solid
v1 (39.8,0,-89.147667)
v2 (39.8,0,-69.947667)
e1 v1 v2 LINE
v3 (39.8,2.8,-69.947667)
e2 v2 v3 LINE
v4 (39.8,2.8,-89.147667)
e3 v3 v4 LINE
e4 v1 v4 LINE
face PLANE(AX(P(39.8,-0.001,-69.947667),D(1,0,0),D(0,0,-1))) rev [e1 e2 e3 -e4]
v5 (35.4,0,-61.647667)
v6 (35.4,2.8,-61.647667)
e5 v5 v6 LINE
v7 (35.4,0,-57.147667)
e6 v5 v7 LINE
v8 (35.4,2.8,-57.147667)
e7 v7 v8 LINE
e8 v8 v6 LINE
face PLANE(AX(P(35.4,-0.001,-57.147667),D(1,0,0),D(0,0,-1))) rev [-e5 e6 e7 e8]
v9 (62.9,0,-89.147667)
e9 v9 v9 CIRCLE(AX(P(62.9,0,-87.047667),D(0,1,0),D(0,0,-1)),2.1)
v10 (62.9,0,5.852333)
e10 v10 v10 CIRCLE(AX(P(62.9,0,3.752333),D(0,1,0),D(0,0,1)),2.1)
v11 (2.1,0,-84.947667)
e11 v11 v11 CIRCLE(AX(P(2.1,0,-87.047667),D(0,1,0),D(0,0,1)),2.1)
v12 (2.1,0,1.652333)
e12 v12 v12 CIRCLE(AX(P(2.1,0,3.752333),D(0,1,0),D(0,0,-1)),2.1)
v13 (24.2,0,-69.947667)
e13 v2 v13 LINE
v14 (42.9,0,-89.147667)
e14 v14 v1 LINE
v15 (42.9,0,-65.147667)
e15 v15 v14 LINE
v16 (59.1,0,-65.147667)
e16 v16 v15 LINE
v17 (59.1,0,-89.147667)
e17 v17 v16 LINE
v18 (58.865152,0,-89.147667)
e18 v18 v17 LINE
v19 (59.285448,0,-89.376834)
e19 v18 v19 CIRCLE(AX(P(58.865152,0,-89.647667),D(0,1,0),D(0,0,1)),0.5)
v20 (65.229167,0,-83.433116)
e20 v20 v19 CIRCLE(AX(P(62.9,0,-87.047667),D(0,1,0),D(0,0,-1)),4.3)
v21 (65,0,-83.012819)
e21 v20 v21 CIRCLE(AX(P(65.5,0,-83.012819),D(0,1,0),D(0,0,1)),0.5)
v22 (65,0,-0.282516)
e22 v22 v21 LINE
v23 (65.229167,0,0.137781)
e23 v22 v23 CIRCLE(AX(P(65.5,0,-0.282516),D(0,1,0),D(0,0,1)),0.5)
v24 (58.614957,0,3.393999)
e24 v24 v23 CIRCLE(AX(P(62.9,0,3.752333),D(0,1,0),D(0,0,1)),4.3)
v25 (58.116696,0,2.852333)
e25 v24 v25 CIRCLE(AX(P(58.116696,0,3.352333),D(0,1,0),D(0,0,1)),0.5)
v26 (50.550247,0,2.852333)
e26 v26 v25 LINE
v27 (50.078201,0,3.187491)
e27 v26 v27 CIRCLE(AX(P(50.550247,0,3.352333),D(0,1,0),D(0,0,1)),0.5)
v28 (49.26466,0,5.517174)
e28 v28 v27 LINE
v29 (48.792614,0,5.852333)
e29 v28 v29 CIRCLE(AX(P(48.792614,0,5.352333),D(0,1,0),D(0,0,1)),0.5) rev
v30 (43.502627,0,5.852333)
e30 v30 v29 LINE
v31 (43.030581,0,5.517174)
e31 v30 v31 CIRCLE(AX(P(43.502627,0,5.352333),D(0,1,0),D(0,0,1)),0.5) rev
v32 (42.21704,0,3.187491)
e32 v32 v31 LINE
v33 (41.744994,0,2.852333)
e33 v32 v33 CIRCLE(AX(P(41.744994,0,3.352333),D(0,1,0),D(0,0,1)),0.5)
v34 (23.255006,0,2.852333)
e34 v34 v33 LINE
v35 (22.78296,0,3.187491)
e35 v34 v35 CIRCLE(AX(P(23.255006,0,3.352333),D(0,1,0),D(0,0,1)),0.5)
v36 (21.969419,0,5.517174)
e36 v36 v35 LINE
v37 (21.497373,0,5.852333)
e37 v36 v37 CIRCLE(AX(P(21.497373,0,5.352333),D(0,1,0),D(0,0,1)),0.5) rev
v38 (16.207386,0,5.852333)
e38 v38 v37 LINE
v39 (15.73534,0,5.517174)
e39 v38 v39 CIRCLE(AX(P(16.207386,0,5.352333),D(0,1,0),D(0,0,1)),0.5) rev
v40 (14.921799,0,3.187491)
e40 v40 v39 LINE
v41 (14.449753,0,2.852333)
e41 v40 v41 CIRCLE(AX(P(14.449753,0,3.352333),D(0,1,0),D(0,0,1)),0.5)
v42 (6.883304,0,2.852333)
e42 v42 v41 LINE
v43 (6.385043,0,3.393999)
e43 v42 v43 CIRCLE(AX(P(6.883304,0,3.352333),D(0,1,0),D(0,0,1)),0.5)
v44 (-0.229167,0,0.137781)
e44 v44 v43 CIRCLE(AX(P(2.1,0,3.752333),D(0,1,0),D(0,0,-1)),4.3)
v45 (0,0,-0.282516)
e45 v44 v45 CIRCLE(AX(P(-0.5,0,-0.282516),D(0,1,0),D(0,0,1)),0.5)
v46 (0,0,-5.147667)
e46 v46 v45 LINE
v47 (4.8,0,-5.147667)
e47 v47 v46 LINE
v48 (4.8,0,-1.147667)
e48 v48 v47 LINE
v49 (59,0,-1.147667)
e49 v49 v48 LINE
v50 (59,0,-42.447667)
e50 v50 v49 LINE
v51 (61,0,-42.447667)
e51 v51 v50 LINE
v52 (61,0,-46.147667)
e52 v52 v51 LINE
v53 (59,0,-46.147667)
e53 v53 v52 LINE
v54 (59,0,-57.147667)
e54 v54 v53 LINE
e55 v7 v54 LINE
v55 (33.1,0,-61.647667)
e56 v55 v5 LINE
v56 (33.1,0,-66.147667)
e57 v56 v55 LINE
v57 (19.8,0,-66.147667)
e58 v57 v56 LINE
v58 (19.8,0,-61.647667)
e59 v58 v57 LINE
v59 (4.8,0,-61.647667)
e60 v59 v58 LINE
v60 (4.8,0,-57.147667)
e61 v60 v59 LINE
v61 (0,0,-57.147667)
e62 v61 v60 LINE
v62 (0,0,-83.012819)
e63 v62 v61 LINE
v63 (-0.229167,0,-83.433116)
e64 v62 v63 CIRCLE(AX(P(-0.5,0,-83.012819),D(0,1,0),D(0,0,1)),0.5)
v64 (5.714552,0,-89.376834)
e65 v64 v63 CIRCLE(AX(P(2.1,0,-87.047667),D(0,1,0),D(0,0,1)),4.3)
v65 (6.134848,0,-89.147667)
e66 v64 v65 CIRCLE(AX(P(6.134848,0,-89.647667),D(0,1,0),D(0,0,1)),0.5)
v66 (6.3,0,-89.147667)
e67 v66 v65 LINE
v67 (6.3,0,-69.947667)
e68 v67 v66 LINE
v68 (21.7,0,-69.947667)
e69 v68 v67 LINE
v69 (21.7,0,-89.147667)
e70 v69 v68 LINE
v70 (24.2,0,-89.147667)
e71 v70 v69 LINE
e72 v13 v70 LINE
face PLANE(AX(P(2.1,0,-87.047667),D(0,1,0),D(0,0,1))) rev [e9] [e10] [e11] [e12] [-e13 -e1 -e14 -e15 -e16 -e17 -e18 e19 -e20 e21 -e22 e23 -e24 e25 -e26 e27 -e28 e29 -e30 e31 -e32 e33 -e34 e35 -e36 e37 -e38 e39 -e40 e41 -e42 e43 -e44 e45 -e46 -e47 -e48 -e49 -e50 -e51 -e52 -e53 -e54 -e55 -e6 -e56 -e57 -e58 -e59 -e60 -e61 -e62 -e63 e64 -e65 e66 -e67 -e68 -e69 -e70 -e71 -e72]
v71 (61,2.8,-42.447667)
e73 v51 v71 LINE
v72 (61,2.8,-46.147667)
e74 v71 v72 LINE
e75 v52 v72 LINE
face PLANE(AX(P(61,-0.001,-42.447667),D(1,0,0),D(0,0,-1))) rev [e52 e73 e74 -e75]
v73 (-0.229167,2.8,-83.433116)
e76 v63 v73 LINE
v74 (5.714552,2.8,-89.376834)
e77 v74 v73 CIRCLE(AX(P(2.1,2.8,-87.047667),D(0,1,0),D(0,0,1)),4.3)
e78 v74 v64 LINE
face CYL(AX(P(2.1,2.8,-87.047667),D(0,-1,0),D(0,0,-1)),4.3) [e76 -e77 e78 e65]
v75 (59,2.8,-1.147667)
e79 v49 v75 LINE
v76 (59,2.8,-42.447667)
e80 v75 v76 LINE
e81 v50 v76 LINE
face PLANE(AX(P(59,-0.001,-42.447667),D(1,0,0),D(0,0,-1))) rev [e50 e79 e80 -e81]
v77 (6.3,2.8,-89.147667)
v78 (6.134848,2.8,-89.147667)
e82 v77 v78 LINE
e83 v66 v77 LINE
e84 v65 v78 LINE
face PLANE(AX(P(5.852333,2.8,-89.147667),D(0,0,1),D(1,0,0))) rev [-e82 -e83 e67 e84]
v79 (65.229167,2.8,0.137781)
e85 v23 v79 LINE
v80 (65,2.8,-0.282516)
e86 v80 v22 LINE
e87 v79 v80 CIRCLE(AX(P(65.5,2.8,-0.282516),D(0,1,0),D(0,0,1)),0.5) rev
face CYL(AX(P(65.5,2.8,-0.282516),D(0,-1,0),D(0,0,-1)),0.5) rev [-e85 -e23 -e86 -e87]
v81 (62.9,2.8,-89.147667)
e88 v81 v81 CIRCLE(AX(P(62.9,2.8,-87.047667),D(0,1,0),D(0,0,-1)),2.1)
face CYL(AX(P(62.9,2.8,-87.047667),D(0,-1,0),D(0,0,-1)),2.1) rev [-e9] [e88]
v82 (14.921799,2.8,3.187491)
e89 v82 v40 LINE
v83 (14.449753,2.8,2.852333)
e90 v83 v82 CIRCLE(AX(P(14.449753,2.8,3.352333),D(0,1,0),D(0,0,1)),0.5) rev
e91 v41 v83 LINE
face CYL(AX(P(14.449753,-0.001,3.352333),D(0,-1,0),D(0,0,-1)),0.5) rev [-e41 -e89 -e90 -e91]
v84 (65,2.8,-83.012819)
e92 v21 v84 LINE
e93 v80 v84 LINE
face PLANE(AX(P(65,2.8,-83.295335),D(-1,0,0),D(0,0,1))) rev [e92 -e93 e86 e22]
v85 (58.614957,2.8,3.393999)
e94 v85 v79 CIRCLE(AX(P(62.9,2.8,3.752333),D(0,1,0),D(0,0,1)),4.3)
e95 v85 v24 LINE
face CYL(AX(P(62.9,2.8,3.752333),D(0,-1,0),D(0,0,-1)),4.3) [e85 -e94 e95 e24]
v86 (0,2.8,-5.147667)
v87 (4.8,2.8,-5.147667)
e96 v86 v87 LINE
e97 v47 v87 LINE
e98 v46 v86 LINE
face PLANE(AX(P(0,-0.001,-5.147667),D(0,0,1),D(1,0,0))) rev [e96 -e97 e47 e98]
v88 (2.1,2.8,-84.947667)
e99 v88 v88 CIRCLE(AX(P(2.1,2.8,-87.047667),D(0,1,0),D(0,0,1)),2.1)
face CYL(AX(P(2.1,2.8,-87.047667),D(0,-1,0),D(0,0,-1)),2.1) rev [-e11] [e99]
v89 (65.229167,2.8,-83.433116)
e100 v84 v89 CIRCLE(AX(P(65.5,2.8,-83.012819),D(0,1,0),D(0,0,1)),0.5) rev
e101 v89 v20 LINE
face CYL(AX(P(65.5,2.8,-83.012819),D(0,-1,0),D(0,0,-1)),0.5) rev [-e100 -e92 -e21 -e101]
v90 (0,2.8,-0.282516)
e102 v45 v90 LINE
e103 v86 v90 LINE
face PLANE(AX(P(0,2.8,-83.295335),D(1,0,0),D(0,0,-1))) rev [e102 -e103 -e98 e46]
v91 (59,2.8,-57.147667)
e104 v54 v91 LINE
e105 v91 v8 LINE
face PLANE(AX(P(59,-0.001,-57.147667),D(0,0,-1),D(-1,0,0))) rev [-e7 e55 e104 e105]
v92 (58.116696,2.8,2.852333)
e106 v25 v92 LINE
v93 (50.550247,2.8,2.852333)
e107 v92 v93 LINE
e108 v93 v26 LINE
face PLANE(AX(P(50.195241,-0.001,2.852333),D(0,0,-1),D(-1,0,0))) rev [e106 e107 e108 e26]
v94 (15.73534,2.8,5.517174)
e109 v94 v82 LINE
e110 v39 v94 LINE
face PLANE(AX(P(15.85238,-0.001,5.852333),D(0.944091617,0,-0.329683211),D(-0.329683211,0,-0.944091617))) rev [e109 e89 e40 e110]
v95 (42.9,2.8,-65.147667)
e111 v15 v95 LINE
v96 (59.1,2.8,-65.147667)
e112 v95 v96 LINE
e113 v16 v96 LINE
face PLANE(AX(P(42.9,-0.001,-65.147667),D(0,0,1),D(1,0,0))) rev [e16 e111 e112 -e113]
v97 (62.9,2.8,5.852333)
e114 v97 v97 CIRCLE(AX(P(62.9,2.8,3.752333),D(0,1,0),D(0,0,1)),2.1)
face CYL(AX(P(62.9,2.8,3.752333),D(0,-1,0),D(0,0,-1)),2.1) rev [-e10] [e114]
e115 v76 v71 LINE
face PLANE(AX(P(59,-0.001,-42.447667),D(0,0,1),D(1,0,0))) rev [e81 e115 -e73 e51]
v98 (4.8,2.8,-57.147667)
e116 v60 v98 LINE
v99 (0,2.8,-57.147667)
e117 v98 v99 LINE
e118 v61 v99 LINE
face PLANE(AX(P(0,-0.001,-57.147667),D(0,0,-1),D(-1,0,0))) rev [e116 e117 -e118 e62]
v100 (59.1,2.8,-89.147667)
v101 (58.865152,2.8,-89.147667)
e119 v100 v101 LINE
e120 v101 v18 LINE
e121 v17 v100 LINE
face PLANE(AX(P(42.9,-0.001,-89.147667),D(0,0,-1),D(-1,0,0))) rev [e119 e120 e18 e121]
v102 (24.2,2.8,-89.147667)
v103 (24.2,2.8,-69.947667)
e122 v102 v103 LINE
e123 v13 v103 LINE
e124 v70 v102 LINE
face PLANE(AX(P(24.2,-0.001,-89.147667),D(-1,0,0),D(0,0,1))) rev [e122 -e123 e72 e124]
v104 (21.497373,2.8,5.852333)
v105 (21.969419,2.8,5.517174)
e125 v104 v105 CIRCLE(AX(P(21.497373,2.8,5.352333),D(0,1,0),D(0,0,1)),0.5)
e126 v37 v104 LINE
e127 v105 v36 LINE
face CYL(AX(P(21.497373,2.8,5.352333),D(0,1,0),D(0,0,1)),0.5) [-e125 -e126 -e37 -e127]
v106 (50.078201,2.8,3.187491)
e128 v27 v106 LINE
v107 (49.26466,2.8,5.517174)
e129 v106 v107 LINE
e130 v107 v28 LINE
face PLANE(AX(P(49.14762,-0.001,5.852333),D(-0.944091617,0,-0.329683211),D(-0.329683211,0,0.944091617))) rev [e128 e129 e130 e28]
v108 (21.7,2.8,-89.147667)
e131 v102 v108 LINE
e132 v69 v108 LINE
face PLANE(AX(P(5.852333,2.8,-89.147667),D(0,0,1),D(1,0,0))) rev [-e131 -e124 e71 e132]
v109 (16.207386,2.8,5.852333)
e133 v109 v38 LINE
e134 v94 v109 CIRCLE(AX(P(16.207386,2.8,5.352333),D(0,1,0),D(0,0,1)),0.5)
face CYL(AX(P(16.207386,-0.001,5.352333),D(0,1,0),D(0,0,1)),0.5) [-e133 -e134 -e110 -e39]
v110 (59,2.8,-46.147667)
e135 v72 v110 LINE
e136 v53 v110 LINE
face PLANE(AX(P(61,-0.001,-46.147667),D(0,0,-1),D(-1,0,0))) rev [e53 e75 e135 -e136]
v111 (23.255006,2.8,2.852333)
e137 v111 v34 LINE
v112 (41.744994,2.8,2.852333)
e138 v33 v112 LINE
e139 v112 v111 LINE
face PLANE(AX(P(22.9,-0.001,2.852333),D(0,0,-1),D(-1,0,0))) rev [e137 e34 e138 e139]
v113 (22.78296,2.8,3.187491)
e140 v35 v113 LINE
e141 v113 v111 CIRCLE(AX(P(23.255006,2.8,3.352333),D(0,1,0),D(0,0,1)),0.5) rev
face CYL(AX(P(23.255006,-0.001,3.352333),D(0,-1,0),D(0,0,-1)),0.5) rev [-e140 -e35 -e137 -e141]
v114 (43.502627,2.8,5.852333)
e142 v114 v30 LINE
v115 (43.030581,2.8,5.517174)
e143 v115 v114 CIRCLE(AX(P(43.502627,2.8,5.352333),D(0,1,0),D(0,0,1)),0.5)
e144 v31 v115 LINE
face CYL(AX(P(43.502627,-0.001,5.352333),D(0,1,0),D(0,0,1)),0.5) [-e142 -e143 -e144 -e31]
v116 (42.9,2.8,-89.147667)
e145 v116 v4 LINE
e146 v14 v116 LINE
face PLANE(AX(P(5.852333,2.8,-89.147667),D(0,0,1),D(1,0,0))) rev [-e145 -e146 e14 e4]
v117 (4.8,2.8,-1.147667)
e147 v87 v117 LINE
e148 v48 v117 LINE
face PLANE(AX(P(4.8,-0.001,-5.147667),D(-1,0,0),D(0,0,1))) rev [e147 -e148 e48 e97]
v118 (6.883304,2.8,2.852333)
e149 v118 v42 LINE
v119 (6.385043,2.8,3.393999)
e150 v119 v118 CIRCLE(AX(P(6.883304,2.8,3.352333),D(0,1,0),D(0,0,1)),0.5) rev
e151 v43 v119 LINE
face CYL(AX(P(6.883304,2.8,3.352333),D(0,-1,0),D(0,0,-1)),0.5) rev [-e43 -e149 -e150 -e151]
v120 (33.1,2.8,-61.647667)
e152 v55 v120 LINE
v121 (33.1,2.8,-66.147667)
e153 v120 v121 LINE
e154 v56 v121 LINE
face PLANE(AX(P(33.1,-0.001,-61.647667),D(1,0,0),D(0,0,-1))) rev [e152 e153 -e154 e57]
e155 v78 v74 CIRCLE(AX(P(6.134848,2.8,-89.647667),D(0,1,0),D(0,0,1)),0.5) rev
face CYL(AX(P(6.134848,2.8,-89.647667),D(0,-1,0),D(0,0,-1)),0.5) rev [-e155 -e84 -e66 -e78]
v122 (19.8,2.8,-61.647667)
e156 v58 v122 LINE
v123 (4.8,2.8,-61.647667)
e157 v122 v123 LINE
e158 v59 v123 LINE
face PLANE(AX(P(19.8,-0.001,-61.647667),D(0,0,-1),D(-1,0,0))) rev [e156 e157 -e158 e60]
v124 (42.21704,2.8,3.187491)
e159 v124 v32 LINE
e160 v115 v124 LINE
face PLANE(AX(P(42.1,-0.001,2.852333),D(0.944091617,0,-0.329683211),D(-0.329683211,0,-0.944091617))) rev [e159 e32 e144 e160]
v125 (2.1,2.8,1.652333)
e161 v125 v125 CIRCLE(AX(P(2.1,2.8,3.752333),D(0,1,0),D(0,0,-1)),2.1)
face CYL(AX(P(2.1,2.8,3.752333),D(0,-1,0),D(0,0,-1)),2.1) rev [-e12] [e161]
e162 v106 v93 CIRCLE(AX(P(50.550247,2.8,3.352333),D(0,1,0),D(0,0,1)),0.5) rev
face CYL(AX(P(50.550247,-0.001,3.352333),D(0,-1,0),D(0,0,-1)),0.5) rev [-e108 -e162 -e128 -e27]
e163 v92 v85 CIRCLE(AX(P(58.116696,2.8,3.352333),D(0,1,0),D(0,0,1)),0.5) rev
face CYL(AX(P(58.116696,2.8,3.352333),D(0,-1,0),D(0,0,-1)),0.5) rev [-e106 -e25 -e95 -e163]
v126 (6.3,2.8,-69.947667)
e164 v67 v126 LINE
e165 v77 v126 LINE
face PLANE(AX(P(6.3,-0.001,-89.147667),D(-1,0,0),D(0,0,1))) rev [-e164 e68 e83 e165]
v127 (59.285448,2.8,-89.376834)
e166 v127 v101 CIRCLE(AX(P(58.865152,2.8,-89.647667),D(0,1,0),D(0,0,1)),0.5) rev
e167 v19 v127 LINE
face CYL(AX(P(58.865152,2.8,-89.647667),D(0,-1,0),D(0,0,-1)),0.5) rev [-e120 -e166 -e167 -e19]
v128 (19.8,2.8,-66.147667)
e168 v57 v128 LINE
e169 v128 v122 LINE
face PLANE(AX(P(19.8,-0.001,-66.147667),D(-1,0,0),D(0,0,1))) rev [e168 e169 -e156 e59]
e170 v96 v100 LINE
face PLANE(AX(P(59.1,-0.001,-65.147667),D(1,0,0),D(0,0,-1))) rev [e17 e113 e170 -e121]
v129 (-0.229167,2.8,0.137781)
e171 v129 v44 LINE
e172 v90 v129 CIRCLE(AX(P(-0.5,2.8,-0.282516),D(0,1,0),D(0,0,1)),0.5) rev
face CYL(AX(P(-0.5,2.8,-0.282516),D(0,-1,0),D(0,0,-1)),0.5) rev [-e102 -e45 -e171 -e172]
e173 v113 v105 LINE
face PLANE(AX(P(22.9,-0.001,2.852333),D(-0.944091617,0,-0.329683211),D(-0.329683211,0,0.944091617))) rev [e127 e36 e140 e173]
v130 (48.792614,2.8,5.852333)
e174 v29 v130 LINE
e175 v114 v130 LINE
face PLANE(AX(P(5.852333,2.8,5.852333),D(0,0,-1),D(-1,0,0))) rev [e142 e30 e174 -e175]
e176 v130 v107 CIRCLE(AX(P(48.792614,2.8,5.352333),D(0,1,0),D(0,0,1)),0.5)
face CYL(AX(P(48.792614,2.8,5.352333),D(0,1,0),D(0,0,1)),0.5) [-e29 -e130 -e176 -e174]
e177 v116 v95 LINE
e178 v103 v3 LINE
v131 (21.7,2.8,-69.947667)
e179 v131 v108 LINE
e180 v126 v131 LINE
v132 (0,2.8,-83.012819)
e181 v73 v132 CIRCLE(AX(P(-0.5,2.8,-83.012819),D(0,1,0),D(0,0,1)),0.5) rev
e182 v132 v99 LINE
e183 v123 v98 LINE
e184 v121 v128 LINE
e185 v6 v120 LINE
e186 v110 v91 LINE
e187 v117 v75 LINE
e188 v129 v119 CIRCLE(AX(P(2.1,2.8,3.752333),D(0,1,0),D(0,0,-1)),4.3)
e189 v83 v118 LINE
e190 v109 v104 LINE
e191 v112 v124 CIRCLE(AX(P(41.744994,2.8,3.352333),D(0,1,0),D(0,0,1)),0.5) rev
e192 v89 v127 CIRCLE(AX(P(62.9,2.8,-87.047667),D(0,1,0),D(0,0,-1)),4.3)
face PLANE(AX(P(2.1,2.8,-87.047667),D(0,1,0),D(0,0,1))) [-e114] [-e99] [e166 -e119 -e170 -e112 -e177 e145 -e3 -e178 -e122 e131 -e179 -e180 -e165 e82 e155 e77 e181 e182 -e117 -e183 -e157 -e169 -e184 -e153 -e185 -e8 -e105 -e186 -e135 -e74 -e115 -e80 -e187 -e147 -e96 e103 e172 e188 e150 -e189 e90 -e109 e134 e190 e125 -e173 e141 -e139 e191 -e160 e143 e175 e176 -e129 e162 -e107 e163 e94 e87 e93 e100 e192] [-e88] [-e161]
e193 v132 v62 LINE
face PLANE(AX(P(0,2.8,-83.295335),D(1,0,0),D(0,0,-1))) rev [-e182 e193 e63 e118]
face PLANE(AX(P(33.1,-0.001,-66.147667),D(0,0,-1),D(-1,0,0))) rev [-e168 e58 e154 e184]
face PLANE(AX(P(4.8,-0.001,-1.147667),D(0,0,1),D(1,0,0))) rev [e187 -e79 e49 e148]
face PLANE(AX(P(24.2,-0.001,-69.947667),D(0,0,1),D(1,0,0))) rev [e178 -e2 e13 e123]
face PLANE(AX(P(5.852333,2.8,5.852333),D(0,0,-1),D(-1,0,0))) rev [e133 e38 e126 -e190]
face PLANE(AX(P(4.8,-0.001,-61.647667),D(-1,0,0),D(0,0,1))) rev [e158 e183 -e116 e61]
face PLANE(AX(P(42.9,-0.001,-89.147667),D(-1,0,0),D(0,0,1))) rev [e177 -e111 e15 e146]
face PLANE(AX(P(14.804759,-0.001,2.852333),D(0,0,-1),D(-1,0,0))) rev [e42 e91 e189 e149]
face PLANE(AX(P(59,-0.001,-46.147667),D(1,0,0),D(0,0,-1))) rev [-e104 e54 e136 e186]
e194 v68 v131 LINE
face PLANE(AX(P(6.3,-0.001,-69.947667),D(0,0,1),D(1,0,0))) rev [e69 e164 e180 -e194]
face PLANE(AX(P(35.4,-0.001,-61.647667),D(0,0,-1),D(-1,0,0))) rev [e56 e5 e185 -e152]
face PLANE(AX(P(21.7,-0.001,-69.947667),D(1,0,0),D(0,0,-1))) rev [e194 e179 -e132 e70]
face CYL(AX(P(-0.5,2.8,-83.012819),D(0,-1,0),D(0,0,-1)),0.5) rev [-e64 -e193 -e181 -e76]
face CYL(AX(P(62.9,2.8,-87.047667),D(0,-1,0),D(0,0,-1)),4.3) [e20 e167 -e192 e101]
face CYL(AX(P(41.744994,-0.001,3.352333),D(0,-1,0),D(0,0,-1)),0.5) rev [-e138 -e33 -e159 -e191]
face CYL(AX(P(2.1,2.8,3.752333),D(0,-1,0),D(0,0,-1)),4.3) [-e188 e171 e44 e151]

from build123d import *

# Parameters (mm, degrees)
BASEPLATE_OUTLINE_R = 2.1
BASEPLATE_DEPTH     = 2.8
CUT_EXTRUDE1_REACH  = 115.438
SKETCH3_W           = 15.4
SKETCH3_H           = 19.2
SKETCH3_W_2         = 15.6
SKETCH3_W_3         = 16.2
SKETCH3_H_2         = 24


# Read off the part's stored shape, not the designer's step: BasePlate
with BuildPart() as part:
    # BasePlate outline → BasePlate (new body)
    with BuildSketch(Plane(origin=(0, 0, 0), x_dir=(1, 0, 0), z_dir=(0, 1, 0))):
        with BuildLine():
            Line((43.502626614, -5.852332608), (48.792614178, -5.852332608))
            ThreePointArc((48.792614178, -5.852332608), (49.082078508, -5.760021707), (49.264659986, -5.517174213))
            Line((49.264659986, -5.517174213), (50.078201202, -3.187491002))
            ThreePointArc((50.078201202, -3.187491002), (50.26078268, -2.944643509), (50.55024701, -2.852332608))
            Line((50.55024701, -2.852332608), (58.116695703, -2.852332608))
            ThreePointArc((58.116695703, -2.852332608), (58.484685739, -3.013831008), (58.614956567, -3.393999275))
            ThreePointArc((58.614956567, -3.393999275), (64.799237397, -7.61016844), (65.229166667, -0.137781095))
            ThreePointArc((65.229166667, -0.137781095), (65.061014427, 0.043158816), (65, 0.282515593))
            Line((65, 0.282515593), (65, 83.012819192))
            ThreePointArc((65, 83.012819192), (65.061014427, 83.252175969), (65.229166667, 83.433115879))
            ThreePointArc((65.229166667, 83.433115879), (65.940559159, 90.088226551), (59.285448487, 89.376834059))
            ThreePointArc((59.285448487, 89.376834059), (59.104508577, 89.208681819), (58.8651518, 89.147667392))
            Line((58.8651518, 89.147667392), (6.1348482, 89.147667392))
            ThreePointArc((6.1348482, 89.147667392), (5.895491423, 89.208681819), (5.714551513, 89.376834059))
            ThreePointArc((5.714551513, 89.376834059), (-0.940559159, 90.088226551), (-0.229166667, 83.433115879))
            ThreePointArc((-0.229166667, 83.433115879), (-0.061014427, 83.252175969), (0, 83.012819192))
            Line((0, 83.012819192), (0, 0.282515593))
            ThreePointArc((0, 0.282515593), (-0.061014427, 0.043158816), (-0.229166667, -0.137781095))
            ThreePointArc((-0.229166667, -0.137781095), (0.200762603, -7.61016844), (6.385043433, -3.393999275))
            ThreePointArc((6.385043433, -3.393999275), (6.515314261, -3.013831008), (6.883304297, -2.852332608))
            Line((6.883304297, -2.852332608), (14.44975299, -2.852332608))
            ThreePointArc((14.44975299, -2.852332608), (14.73921732, -2.944643509), (14.921798798, -3.187491002))
            Line((14.921798798, -3.187491002), (15.735340014, -5.517174213))
            ThreePointArc((15.735340014, -5.517174213), (15.917921492, -5.760021707), (16.207385822, -5.852332608))
            Line((16.207385822, -5.852332608), (21.497373386, -5.852332608))
            ThreePointArc((21.497373386, -5.852332608), (21.786837716, -5.760021707), (21.969419194, -5.517174213))
            Line((21.969419194, -5.517174213), (22.78296041, -3.187491002))
            ThreePointArc((22.78296041, -3.187491002), (22.965541888, -2.944643509), (23.255006218, -2.852332608))
            Line((23.255006218, -2.852332608), (41.744993782, -2.852332608))
            ThreePointArc((41.744993782, -2.852332608), (42.034458112, -2.944643509), (42.21703959, -3.187491002))
            Line((42.21703959, -3.187491002), (43.030580806, -5.517174213))
            ThreePointArc((43.030580806, -5.517174213), (43.213162284, -5.760021707), (43.502626614, -5.852332608))
        make_face()
        with Locations((2.1, -3.752332608)):
            Circle(BASEPLATE_OUTLINE_R, mode=Mode.SUBTRACT)
        with Locations((62.9, -3.752332608)):
            Circle(BASEPLATE_OUTLINE_R, mode=Mode.SUBTRACT)
        with Locations((2.1, 87.047667392)):
            Circle(BASEPLATE_OUTLINE_R, mode=Mode.SUBTRACT)
        with Locations((62.9, 87.047667392)):
            Circle(BASEPLATE_OUTLINE_R, mode=Mode.SUBTRACT)
    extrude(amount=BASEPLATE_DEPTH)

    # Sketch3 → Cut-Extrude1 (cut, up to next)
    with BuildSketch(Plane(origin=(0, 2.8, 0), x_dir=(1, 0, 0), z_dir=(0, 1, 0)), mode=Mode.PRIVATE) as cut_extrude1_sk1:
        Polygon((4.8, 1.147667392), (59, 1.147667392), (59, 42.447667392), (61, 42.447667392), (61, 46.147667392), (59, 46.147667392), (59, 57.147667392), (35.4, 57.147667392), (35.4, 61.647667392), (33.1, 61.647667392), (33.1, 66.147667392), (19.8, 66.147667392), (19.8, 61.647667392), (4.8, 61.647667392), (4.8, 57.147667392), (0, 57.147667392), (0, 5.147667392), (4.8, 5.147667392), align=None)
    cut_extrude1_tool1 = extrude(cut_extrude1_sk1.sketch, amount=-CUT_EXTRUDE1_REACH, mode=Mode.PRIVATE) & part.part
    # Sketch3 → Cut-Extrude1 (cut, up to next)
    with BuildSketch(Plane(origin=(0, 2.8, 0), x_dir=(1, 0, 0), z_dir=(0, 1, 0)), mode=Mode.PRIVATE) as cut_extrude1_sk2:
        with Locations((14, 79.547667392)):
            Rectangle(SKETCH3_W, SKETCH3_H)
    cut_extrude1_tool2 = extrude(cut_extrude1_sk2.sketch, amount=-CUT_EXTRUDE1_REACH, mode=Mode.PRIVATE) & part.part
    # Sketch3 → Cut-Extrude1 (cut, up to next)
    with BuildSketch(Plane(origin=(0, 2.8, 0), x_dir=(1, 0, 0), z_dir=(0, 1, 0)), mode=Mode.PRIVATE) as cut_extrude1_sk3:
        with Locations((32, 79.547667392)):
            Rectangle(SKETCH3_W_2, SKETCH3_H)
    cut_extrude1_tool3 = extrude(cut_extrude1_sk3.sketch, amount=-CUT_EXTRUDE1_REACH, mode=Mode.PRIVATE) & part.part
    # Sketch3 → Cut-Extrude1 (cut, up to next)
    with BuildSketch(Plane(origin=(0, 2.8, 0), x_dir=(1, 0, 0), z_dir=(0, 1, 0)), mode=Mode.PRIVATE) as cut_extrude1_sk4:
        with Locations((51, 77.147667392)):
            Rectangle(SKETCH3_W_3, SKETCH3_H_2)
    cut_extrude1_tool4 = extrude(cut_extrude1_sk4.sketch, amount=-CUT_EXTRUDE1_REACH, mode=Mode.PRIVATE) & part.part
    add(cut_extrude1_tool1.solids().sort_by_distance((29.290557, 2.8, -31.112428))[0], mode=Mode.SUBTRACT)
    add(cut_extrude1_tool2.solids().sort_by_distance((14, 2.8, -79.547667))[0], mode=Mode.SUBTRACT)
    add(cut_extrude1_tool3.solids().sort_by_distance((32, 2.8, -79.547667))[0], mode=Mode.SUBTRACT)
    add(cut_extrude1_tool4.solids().sort_by_distance((51, 2.8, -77.147667))[0], mode=Mode.SUBTRACT)


solid = part.part
